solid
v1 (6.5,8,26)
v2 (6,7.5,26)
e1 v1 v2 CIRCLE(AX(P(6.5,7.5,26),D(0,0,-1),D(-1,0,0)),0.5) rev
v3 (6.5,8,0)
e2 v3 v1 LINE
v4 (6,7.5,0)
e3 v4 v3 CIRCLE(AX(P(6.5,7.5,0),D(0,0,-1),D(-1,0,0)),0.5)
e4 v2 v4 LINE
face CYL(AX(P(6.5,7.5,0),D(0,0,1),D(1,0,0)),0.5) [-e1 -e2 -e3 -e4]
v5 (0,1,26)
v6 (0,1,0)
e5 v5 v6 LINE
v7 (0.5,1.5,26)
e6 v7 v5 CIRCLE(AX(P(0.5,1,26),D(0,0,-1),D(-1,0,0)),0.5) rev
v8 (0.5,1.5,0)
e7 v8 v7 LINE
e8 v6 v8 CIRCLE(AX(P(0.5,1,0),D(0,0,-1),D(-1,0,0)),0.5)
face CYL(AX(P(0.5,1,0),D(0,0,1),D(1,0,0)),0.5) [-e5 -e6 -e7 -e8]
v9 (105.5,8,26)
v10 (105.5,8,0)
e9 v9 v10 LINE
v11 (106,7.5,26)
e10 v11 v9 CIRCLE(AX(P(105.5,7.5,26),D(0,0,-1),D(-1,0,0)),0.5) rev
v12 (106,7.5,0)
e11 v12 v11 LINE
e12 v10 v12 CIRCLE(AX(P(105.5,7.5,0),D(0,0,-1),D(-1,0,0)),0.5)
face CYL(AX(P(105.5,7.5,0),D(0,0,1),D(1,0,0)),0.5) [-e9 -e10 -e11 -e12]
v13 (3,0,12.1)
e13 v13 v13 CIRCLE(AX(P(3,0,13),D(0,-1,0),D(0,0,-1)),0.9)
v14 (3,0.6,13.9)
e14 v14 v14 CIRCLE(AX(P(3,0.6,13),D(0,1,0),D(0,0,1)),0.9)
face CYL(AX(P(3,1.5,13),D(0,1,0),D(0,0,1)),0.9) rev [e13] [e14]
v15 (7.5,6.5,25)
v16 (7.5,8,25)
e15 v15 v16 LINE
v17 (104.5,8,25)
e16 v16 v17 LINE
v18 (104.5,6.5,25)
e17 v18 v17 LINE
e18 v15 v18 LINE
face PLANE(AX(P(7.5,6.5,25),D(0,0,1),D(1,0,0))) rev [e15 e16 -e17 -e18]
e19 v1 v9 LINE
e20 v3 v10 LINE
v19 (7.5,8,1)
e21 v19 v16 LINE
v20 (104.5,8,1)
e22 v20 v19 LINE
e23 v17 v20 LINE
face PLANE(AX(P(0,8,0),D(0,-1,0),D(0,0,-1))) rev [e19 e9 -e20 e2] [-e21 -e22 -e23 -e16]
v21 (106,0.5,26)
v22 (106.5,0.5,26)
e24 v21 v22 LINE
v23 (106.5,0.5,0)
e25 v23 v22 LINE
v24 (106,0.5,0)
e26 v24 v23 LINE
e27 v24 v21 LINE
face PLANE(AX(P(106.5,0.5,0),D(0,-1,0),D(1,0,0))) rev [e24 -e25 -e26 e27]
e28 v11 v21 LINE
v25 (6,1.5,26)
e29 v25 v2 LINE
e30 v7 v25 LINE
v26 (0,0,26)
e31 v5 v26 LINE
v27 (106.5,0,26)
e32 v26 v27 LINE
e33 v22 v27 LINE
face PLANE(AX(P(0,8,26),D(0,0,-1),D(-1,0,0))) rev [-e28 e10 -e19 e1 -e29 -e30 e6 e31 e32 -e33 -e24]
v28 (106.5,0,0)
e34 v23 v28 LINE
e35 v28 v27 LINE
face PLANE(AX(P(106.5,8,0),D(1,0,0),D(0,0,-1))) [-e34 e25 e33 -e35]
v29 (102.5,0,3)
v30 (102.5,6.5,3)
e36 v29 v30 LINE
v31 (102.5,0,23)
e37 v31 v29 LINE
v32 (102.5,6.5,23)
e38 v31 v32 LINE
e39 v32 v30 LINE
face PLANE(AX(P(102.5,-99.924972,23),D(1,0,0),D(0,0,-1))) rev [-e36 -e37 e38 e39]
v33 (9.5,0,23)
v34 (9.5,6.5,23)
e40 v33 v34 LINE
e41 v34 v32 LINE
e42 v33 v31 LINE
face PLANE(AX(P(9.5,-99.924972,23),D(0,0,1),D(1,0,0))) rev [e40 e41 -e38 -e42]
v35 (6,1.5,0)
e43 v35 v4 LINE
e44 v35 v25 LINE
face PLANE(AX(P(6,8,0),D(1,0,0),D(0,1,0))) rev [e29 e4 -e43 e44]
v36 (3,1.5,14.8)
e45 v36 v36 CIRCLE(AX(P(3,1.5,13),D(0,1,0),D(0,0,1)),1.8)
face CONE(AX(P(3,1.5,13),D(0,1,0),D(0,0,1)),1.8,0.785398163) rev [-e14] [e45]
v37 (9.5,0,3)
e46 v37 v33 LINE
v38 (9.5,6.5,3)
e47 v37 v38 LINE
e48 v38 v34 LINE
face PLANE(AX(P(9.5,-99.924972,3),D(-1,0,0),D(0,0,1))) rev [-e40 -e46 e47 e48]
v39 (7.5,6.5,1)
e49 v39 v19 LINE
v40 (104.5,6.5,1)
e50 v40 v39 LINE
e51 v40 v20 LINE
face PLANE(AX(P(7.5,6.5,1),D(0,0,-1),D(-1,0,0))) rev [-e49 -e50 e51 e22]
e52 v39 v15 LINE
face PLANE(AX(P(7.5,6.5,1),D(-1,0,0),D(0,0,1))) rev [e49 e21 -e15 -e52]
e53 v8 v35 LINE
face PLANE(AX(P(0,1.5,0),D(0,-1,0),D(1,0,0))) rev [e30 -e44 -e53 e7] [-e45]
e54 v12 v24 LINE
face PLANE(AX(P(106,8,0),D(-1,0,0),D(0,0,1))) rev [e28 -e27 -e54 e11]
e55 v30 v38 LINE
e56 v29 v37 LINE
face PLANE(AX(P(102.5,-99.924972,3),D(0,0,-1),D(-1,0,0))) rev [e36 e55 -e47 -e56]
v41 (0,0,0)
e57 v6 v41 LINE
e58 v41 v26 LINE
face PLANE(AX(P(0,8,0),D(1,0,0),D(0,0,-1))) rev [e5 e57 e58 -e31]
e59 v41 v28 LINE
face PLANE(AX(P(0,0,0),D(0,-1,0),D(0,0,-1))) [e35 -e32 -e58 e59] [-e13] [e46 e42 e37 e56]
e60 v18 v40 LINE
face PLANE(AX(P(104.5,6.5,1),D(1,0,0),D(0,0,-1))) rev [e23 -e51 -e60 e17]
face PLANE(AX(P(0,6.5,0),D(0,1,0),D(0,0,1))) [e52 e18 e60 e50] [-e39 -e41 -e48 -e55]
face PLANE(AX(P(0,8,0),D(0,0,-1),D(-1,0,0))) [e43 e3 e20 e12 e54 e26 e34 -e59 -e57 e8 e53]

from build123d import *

# Parameters (mm, degrees)
SKETCH1_W                                            = 106.5
SKETCH1_H                                            = 26
BOSS_EXTRUDE1_DEPTH                                  = 8
CUT_EXTRUDE1_START                                   = -26
CUT_EXTRUDE1_OUTLINE_W                               = 6
CUT_EXTRUDE1_OUTLINE_H                               = 6.5
CUT_EXTRUDE1_OUTLINE_W_2                             = 0.5
CUT_EXTRUDE1_OUTLINE_H_2                             = 7.5
CUT_EXTRUDE1_DEPTH                                   = 26
FILLET1_R                                            = 0.5
CSK_FOR_M1_6_COUNTERSUNK_FLAT_HEAD_SCREW_D           = 1.8
CSK_FOR_M1_6_COUNTERSUNK_FLAT_HEAD_SCREW_DEPTH       = 15
CSK_FOR_M1_6_COUNTERSUNK_FLAT_HEAD_SCREW_CSINK_D     = 3.6
CSK_FOR_M1_6_COUNTERSUNK_FLAT_HEAD_SCREW_CSINK_ANGLE = 90
CSK_FOR_M1_6_COUNTERSUNK_FLAT_HEAD_SCREW_TIP         = 0.540774557
SKETCH14_W                                           = 97
SKETCH14_H                                           = 24
CUT_EXTRUDE7_DEPTH                                   = 110.919288571
SKETCH14_3_W                                         = 97
SKETCH14_3_H                                         = 24
BOSS_EXTRUDE3_DEPTH                                  = 1
SKETCH18_W                                           = 97
SKETCH18_H                                           = 24
CUT_EXTRUDE8_DEPTH                                   = 10
SKETCH20_W                                           = 97
SKETCH20_H                                           = 24
SKETCH20_W_2                                         = 93
SKETCH20_H_2                                         = 20
BOSS_EXTRUDE4_DEPTH                                  = 8
SKETCH20_2_W                                         = 97
SKETCH20_2_H                                         = 24
SKETCH20_2_W_2                                       = 93
SKETCH20_2_H_2                                       = 20
CUT_EXTRUDE9_DEPTH                                   = 1.5


# Read off the part's stored shape, not the designer's step: Cut-Extrude1
with BuildPart() as part:
    # Sketch1 → Boss-Extrude1 (new body)
    with BuildSketch(Plane(origin=(0, 0, 0), x_dir=(1, 0, 0), z_dir=(0, 1, 0))):
        with Locations((53.25, -13)):
            Rectangle(SKETCH1_W, SKETCH1_H)
    extrude(amount=BOSS_EXTRUDE1_DEPTH)

    # Cut-Extrude1 outline → Cut-Extrude1 (cut)
    with BuildSketch(Plane.XY.offset(26).offset(CUT_EXTRUDE1_START)):
        with Locations((3, 4.75)):
            Rectangle(CUT_EXTRUDE1_OUTLINE_W, CUT_EXTRUDE1_OUTLINE_H)
        with Locations((106.25, 4.25)):
            Rectangle(CUT_EXTRUDE1_OUTLINE_W_2, CUT_EXTRUDE1_OUTLINE_H_2)
    extrude(amount=CUT_EXTRUDE1_DEPTH, mode=Mode.SUBTRACT)

    # Fillet1
    fillet1_edges = [part.edges().sort_by_distance(p)[0] for p in [
        (106, 8, 13),
        (0, 1.5, 13),
        (6, 8, 13),
    ]]
    fillet(fillet1_edges, radius=FILLET1_R)

    # CSK for M1.6 Countersunk Flat Head Screw1
    with Locations(Plane(origin=(3, 1.5, 13), x_dir=(1, 0, 0), z_dir=(0, 1, 0))):
        with Locations((0, 0)):
            CounterSinkHole(CSK_FOR_M1_6_COUNTERSUNK_FLAT_HEAD_SCREW_D / 2, CSK_FOR_M1_6_COUNTERSUNK_FLAT_HEAD_SCREW_CSINK_D / 2, depth=CSK_FOR_M1_6_COUNTERSUNK_FLAT_HEAD_SCREW_DEPTH, counter_sink_angle=CSK_FOR_M1_6_COUNTERSUNK_FLAT_HEAD_SCREW_CSINK_ANGLE)
            with Locations((0, 0, -(CSK_FOR_M1_6_COUNTERSUNK_FLAT_HEAD_SCREW_DEPTH + CSK_FOR_M1_6_COUNTERSUNK_FLAT_HEAD_SCREW_TIP / 2))):  # 118° drill point
                Cone(0, CSK_FOR_M1_6_COUNTERSUNK_FLAT_HEAD_SCREW_D / 2, CSK_FOR_M1_6_COUNTERSUNK_FLAT_HEAD_SCREW_TIP, mode=Mode.SUBTRACT)

    # Sketch14 → Cut-Extrude7 (cut, through all)
    with BuildSketch(Plane(origin=(0, 8, 0), x_dir=(1, 0, 0), z_dir=(0, 1, 0))):
        with Locations((56, -13)):
            Rectangle(SKETCH14_W, SKETCH14_H)
    extrude(amount=-CUT_EXTRUDE7_DEPTH, mode=Mode.SUBTRACT)

    # Sketch14<3> → Boss-Extrude3 (add)
    with BuildSketch(Plane(origin=(0, 8, 0), x_dir=(1, 0, 0), z_dir=(0, 1, 0))):
        with Locations((56, -13)):
            Rectangle(SKETCH14_3_W, SKETCH14_3_H)
    extrude(amount=-BOSS_EXTRUDE3_DEPTH)

    # Sketch18 → Cut-Extrude8 (cut)
    with BuildSketch(Plane(origin=(0, 0, 0), x_dir=(1, 0, 0), z_dir=(0, 1, 0))):
        with Locations((56, -13)):
            Rectangle(SKETCH18_W, SKETCH18_H)
    extrude(amount=CUT_EXTRUDE8_DEPTH, mode=Mode.SUBTRACT)

    # Sketch20 → Boss-Extrude4 (add)
    with BuildSketch(Plane(origin=(0, 8, 0), x_dir=(1, 0, 0), z_dir=(0, 1, 0))):
        with Locations((56, -13)):
            Rectangle(SKETCH20_W, SKETCH20_H)
        with Locations((56, -13)):
            Rectangle(SKETCH20_W_2, SKETCH20_H_2, mode=Mode.SUBTRACT)
    extrude(amount=-BOSS_EXTRUDE4_DEPTH)

    # Sketch20<2> → Cut-Extrude9 (cut)
    with BuildSketch(Plane(origin=(0, 8, 0), x_dir=(1, 0, 0), z_dir=(0, 1, 0))):
        with Locations((56, -13)):
            Rectangle(SKETCH20_2_W, SKETCH20_2_H)
        with Locations((56, -13)):
            Rectangle(SKETCH20_2_W_2, SKETCH20_2_H_2, mode=Mode.SUBTRACT)
    extrude(amount=-CUT_EXTRUDE9_DEPTH, mode=Mode.SUBTRACT)


solid = part.part
